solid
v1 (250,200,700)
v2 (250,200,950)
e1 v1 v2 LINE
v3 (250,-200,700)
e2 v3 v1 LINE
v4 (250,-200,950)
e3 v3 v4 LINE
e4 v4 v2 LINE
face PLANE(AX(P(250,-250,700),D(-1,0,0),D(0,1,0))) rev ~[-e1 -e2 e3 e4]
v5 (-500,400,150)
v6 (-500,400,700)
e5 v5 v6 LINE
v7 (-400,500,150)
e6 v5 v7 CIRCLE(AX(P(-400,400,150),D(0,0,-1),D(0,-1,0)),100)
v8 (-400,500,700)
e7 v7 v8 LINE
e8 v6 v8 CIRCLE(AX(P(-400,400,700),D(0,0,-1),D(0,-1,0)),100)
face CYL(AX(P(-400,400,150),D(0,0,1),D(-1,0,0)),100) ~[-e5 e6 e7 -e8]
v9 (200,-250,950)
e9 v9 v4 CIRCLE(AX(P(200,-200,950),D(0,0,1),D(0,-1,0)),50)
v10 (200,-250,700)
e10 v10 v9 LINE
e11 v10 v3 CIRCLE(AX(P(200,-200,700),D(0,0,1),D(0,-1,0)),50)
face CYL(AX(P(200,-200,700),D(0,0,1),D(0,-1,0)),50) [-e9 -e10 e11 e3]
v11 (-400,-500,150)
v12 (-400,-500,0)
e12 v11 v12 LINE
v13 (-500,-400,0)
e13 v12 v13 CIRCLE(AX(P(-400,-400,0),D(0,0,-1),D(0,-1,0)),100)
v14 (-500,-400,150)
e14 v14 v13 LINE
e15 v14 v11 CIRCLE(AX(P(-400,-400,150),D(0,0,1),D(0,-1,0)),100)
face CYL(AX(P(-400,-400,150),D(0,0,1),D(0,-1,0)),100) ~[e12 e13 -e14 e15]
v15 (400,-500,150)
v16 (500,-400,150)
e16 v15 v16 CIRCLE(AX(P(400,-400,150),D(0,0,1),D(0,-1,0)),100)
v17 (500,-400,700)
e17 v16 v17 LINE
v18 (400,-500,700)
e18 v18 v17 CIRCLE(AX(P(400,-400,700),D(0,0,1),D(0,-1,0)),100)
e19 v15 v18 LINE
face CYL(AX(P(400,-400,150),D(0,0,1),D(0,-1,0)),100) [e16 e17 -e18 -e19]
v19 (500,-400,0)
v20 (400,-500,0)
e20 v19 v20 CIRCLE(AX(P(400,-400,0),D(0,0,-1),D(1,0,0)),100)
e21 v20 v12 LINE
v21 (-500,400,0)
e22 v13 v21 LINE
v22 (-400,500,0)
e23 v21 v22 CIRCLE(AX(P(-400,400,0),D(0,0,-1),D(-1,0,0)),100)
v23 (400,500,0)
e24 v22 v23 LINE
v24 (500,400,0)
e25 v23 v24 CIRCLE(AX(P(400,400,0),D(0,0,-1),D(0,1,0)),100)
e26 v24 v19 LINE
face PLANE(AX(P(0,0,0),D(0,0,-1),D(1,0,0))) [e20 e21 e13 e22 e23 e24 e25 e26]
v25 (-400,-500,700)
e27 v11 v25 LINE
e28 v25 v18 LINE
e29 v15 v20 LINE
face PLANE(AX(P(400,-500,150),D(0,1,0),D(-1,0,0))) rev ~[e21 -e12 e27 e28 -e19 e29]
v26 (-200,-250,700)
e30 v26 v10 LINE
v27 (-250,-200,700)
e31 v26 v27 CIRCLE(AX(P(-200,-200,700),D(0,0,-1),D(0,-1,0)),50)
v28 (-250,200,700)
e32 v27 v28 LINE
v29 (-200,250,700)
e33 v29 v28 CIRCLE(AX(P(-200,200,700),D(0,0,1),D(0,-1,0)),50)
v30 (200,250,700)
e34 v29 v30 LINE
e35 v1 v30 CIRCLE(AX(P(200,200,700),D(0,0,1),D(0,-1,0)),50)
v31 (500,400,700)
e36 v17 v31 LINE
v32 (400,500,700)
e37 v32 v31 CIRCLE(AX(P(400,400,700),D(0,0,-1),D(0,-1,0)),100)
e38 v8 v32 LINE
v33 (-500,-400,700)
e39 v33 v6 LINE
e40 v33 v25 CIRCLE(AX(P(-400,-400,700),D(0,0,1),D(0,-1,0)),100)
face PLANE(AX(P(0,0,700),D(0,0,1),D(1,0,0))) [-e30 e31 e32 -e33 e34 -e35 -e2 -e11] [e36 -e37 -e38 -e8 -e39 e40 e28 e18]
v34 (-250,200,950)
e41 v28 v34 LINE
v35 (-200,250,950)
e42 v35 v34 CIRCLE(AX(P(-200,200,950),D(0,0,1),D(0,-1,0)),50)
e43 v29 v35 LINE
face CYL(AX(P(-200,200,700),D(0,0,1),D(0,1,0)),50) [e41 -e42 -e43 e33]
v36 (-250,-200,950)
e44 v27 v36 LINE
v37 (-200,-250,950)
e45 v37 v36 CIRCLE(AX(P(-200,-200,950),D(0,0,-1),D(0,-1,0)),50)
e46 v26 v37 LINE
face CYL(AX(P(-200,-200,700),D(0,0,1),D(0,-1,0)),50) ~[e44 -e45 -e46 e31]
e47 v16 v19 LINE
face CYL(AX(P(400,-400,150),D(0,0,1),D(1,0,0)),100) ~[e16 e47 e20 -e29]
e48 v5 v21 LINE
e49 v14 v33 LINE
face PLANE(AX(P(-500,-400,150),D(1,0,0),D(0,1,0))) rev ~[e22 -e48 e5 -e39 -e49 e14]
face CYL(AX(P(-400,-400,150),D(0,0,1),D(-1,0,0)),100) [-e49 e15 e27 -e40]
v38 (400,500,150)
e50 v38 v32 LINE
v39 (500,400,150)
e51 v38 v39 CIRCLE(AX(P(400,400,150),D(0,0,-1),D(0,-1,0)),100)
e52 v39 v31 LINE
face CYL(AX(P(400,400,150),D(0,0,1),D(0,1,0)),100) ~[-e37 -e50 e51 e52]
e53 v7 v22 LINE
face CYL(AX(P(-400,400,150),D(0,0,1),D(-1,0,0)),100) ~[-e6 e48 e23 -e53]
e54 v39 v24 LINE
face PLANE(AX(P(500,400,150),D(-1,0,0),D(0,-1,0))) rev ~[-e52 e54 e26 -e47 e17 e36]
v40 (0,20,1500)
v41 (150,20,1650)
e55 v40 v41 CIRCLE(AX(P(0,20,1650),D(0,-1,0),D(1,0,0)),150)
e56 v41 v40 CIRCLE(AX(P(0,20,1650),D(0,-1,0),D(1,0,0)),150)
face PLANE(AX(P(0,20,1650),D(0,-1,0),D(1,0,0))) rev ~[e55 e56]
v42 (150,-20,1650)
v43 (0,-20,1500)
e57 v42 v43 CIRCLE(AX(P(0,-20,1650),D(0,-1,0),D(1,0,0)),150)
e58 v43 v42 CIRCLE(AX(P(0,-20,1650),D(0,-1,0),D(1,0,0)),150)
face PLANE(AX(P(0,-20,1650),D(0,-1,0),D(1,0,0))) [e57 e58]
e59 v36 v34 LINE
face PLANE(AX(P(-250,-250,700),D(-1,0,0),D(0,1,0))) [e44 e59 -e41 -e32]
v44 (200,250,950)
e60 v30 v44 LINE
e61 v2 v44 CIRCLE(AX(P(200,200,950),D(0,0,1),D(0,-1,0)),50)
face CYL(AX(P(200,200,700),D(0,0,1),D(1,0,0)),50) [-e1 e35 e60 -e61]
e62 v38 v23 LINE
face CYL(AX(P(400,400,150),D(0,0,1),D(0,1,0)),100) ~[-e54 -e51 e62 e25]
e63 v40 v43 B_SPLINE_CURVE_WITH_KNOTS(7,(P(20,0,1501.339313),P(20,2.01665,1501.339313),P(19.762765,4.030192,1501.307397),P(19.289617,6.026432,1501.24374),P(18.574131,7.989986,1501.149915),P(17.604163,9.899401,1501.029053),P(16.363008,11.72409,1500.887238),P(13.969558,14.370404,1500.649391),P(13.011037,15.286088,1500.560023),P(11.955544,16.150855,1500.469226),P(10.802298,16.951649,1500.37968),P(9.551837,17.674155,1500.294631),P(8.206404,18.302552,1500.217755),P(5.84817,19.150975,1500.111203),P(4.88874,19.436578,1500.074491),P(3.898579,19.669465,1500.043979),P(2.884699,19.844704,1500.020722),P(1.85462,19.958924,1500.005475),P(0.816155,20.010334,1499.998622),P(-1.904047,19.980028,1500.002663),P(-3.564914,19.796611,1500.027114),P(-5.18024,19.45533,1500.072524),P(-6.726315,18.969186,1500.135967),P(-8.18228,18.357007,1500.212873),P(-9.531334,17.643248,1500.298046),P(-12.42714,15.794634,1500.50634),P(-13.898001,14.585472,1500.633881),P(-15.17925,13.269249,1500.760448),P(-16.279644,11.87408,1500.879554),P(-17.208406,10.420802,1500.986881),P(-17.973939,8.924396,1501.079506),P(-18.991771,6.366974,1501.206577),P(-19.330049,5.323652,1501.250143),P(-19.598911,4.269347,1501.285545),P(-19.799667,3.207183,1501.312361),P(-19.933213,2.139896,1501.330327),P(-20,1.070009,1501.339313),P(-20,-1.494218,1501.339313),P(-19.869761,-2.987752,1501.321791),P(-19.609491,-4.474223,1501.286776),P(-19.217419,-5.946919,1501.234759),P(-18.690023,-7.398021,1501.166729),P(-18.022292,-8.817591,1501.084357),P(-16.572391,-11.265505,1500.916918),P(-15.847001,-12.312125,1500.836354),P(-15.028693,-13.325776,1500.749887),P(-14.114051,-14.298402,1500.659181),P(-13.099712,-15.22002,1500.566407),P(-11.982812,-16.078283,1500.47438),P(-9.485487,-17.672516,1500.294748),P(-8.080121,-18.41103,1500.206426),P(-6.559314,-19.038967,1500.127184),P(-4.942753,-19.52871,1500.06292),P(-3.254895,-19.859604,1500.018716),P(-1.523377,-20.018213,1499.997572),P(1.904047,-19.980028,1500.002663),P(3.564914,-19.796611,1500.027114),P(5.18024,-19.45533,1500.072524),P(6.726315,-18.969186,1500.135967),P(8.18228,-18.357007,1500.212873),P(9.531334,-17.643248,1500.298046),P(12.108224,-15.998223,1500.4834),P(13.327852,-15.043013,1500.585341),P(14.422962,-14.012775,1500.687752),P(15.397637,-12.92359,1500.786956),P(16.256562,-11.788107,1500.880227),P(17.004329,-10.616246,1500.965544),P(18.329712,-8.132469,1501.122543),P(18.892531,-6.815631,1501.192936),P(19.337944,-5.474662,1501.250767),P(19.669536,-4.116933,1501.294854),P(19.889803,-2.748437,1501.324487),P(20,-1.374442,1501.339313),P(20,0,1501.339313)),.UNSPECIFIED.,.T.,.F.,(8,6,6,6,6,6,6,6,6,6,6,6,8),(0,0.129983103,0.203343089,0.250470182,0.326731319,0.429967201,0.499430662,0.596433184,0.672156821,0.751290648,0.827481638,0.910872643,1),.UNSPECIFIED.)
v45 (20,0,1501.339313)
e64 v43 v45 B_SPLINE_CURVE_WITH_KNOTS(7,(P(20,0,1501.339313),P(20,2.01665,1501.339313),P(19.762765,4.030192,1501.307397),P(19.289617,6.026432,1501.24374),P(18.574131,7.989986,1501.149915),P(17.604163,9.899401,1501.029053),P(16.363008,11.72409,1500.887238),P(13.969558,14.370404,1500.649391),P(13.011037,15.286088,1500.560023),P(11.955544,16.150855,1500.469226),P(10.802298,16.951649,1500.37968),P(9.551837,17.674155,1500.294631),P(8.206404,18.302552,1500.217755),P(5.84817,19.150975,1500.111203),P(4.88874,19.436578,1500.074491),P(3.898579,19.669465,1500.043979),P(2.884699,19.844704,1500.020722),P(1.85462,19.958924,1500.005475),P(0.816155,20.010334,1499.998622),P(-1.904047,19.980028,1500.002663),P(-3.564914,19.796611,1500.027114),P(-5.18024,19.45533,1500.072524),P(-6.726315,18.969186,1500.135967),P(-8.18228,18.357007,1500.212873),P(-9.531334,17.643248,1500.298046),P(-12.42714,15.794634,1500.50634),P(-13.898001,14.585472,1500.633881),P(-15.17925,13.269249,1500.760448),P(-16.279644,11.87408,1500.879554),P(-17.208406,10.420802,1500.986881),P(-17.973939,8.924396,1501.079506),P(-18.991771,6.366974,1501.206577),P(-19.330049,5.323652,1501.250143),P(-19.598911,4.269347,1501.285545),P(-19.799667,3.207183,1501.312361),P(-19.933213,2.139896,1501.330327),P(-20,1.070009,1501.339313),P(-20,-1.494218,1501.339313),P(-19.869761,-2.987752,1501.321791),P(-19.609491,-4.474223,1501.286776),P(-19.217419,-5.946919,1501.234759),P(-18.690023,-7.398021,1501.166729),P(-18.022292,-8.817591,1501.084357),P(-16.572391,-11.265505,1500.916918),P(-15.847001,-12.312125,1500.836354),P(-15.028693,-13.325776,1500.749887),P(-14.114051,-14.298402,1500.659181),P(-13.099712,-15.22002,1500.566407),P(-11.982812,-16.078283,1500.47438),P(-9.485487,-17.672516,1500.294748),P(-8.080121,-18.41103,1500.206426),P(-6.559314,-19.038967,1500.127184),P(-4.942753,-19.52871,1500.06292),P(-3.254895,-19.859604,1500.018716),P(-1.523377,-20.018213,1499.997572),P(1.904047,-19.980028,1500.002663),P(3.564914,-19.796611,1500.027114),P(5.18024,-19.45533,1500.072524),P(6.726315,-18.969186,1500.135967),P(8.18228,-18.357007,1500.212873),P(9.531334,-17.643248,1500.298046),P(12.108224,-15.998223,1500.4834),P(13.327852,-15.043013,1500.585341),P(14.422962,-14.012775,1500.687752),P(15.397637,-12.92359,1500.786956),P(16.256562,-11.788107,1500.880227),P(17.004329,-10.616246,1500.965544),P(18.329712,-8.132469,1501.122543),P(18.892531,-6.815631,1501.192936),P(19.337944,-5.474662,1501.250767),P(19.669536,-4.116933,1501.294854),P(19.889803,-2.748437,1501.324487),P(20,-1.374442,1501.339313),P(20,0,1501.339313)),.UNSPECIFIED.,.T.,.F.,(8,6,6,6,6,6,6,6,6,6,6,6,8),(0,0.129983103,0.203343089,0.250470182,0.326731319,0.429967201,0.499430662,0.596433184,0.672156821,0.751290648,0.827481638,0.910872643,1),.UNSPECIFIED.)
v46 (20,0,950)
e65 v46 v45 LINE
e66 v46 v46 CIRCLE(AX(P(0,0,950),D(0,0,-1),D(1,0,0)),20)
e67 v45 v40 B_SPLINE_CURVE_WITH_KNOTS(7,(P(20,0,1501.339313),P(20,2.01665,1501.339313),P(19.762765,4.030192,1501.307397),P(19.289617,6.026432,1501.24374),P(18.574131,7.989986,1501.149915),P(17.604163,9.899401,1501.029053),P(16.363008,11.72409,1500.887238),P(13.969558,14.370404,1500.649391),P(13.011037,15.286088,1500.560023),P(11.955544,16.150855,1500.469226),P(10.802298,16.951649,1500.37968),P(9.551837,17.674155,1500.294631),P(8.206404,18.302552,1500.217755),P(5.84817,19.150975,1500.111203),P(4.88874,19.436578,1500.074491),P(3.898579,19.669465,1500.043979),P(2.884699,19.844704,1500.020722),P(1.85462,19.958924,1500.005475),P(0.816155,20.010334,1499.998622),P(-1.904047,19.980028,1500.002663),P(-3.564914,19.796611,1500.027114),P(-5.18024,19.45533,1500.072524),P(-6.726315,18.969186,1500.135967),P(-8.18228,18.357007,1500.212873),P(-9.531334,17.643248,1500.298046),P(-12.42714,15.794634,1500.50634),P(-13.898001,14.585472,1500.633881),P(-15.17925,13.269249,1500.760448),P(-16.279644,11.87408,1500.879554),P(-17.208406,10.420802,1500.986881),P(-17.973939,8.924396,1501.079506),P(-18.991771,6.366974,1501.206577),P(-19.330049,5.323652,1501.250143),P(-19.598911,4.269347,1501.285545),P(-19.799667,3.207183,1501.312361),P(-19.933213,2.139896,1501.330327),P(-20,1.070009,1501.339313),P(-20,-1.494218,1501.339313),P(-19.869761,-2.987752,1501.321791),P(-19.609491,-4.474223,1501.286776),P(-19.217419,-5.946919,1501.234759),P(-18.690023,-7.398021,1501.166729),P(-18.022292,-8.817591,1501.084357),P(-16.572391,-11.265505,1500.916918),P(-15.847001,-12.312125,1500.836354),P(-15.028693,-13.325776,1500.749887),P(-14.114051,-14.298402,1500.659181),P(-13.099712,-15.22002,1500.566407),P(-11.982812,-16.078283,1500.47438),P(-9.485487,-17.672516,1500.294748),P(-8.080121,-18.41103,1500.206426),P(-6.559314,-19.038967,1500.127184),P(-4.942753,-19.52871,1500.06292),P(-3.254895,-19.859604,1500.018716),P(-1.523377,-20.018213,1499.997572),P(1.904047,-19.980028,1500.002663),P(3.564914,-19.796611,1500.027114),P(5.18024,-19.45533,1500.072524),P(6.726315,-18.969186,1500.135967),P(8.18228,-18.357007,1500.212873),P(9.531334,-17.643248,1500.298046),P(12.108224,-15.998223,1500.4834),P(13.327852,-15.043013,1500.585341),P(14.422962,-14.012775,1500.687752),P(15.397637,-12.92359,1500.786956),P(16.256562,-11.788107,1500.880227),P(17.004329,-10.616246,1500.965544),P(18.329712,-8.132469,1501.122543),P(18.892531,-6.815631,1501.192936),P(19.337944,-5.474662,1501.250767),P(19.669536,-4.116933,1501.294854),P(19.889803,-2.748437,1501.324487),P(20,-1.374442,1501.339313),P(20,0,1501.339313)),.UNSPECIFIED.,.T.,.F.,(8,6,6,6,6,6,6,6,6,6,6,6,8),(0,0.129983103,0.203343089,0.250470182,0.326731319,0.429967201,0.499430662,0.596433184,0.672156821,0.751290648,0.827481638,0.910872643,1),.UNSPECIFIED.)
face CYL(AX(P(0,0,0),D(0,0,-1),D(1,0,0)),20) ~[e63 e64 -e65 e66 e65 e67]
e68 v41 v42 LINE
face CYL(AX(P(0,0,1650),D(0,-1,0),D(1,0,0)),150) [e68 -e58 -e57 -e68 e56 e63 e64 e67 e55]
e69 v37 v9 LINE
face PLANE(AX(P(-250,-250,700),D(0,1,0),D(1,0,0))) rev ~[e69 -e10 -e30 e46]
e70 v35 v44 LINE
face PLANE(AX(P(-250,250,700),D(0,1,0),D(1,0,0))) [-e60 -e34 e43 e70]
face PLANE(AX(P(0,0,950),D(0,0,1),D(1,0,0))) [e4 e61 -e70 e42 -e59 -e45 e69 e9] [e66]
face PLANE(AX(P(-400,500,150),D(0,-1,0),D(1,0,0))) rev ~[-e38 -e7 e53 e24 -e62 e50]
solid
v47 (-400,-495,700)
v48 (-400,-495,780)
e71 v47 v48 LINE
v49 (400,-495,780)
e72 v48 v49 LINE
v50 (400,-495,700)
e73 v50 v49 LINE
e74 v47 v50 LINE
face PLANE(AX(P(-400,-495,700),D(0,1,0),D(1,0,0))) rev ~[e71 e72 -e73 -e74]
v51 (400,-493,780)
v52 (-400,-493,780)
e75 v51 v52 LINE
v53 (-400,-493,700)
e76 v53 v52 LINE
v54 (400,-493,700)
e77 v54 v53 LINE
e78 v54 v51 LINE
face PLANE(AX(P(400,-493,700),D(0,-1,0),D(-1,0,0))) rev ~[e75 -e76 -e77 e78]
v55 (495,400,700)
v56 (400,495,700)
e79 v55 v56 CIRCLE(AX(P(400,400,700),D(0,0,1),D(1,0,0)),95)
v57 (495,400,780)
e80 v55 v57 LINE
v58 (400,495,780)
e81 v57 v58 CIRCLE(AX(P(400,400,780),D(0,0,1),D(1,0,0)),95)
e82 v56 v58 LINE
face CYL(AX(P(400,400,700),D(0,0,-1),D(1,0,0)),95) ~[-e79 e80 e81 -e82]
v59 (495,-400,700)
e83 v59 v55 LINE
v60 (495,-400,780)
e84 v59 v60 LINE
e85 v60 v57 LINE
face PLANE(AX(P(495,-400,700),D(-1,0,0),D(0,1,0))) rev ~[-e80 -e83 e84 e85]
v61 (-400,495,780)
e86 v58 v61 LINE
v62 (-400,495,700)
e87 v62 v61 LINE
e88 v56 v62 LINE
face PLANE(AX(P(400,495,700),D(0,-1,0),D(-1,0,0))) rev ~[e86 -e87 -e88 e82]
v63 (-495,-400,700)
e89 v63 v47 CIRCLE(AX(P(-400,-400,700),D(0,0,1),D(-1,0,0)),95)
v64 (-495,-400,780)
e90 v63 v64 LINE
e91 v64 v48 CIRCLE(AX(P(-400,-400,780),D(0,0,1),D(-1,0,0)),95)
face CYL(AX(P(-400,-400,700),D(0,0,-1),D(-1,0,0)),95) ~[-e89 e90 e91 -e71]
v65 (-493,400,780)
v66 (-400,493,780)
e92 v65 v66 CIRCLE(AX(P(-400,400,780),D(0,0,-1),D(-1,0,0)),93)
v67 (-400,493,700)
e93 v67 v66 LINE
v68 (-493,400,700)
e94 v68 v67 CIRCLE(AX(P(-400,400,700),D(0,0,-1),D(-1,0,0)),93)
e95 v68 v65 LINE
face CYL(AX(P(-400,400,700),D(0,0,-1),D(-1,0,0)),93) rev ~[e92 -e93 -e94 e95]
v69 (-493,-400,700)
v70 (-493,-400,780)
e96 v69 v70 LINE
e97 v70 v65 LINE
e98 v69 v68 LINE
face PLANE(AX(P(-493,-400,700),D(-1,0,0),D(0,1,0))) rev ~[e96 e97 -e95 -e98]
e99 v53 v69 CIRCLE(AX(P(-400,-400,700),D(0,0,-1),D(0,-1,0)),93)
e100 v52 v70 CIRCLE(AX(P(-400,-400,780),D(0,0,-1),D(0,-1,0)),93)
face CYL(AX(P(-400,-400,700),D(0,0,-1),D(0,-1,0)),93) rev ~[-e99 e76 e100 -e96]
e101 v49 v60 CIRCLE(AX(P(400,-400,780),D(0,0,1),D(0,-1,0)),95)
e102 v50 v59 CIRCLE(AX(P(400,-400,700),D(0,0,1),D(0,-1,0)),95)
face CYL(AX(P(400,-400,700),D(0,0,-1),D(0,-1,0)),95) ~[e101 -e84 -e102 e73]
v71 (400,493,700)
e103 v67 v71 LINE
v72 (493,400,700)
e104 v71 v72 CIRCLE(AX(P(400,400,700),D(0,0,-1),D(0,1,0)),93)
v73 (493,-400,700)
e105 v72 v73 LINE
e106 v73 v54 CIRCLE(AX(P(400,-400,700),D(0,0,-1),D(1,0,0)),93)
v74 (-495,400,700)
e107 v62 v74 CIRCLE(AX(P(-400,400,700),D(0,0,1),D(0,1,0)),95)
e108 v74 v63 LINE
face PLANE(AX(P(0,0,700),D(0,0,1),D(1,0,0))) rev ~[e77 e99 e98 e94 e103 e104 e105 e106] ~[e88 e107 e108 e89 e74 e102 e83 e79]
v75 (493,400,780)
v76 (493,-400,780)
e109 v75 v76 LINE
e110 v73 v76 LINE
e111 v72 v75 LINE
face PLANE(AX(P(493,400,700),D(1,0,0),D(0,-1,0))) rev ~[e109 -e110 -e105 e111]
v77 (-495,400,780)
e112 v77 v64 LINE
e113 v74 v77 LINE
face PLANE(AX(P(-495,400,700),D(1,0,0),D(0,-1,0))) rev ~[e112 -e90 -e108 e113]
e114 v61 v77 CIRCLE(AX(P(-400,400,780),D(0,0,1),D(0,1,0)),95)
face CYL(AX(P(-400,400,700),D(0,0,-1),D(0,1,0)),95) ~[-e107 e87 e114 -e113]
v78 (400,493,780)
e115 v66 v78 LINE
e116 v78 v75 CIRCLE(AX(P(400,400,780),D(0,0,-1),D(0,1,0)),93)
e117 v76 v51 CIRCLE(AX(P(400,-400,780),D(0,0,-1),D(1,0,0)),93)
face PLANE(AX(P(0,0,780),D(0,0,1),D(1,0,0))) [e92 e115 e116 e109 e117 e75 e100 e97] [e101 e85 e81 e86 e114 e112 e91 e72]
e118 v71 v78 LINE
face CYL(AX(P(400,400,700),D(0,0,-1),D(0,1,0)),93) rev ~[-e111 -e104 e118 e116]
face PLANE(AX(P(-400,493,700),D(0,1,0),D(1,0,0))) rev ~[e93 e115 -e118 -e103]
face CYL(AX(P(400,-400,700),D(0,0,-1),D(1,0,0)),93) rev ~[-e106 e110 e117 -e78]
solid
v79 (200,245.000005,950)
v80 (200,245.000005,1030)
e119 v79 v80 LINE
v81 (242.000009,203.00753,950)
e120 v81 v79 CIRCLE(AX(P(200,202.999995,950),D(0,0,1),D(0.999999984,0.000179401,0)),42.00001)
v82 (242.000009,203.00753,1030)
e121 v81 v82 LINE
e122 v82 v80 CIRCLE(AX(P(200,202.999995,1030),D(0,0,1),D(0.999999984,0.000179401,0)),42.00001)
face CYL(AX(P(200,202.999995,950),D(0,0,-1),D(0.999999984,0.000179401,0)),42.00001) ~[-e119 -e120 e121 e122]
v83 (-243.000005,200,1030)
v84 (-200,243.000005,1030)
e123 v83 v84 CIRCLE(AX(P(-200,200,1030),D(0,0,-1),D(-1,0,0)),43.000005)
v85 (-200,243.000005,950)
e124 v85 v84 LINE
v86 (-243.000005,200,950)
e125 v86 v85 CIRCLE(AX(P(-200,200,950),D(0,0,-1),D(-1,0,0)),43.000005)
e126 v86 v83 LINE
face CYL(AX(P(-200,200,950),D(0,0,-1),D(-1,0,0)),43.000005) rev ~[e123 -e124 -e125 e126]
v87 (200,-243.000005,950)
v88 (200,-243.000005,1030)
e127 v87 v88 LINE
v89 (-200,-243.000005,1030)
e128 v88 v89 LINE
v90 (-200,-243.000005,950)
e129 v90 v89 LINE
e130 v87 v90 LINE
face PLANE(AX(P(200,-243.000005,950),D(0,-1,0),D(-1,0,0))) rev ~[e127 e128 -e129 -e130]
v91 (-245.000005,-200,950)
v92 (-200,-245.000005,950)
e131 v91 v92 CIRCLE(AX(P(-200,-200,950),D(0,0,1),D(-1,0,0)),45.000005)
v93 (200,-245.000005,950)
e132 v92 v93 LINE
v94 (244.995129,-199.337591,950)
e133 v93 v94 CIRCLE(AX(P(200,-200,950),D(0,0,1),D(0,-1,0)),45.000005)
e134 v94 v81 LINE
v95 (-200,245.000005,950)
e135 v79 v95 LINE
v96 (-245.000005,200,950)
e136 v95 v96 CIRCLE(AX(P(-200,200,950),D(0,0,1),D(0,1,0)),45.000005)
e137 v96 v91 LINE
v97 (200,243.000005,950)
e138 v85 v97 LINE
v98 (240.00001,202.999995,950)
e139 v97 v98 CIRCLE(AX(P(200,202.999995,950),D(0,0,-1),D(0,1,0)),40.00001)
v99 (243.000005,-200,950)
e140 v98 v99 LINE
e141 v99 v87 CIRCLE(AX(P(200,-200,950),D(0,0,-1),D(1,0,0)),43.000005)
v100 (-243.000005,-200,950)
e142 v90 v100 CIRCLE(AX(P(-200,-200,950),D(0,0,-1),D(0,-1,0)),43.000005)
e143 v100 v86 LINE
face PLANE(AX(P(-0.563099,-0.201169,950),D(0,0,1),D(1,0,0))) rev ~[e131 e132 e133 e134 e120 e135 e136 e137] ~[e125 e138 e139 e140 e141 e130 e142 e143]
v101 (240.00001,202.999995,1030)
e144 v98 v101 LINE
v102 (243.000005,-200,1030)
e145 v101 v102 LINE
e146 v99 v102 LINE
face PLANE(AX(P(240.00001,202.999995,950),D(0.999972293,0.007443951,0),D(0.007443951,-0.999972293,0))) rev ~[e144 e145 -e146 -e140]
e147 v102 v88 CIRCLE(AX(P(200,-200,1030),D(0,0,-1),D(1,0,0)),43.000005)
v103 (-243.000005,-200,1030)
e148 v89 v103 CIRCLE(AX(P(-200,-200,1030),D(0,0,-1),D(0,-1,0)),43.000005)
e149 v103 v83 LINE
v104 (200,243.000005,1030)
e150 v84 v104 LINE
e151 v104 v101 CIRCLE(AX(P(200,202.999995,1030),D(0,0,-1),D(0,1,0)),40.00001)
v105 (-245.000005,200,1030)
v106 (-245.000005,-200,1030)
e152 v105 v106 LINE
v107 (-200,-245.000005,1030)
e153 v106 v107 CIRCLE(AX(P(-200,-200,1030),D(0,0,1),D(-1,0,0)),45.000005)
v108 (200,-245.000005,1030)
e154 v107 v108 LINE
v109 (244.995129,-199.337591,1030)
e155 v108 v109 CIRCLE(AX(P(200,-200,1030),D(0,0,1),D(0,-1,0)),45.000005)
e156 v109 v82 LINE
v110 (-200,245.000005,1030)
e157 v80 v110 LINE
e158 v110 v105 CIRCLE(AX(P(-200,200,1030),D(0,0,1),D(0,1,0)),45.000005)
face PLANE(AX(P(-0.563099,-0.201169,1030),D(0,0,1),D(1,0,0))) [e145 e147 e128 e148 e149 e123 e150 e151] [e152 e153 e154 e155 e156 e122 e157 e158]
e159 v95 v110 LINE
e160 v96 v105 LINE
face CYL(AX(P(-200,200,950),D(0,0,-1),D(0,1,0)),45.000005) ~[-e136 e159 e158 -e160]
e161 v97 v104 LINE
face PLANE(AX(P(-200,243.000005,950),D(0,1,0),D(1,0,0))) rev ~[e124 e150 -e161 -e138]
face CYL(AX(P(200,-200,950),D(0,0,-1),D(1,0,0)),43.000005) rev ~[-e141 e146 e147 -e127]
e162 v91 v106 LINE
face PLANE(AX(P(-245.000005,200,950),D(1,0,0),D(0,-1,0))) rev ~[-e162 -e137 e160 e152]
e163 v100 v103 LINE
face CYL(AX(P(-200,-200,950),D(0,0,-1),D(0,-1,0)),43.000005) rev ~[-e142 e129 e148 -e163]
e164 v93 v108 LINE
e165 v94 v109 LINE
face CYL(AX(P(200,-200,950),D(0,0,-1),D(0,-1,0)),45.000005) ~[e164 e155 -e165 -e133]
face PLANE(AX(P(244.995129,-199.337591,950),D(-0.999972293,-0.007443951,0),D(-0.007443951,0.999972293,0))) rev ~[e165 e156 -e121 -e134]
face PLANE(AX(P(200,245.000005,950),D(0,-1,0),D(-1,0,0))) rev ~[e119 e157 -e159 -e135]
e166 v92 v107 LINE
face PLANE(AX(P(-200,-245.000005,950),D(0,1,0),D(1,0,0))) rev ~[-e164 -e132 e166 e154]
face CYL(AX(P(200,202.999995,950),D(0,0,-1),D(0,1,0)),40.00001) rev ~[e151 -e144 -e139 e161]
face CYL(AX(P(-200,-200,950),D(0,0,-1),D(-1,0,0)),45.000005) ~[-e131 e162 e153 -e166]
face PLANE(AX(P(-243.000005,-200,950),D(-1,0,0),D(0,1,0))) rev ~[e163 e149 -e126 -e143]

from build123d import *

# Parameters (mm, degrees)
F2_W      = 900
F2_H      = 900
F3_DEPTH  = 150
F4_W      = 1000
F4_H      = 1000
F5_DEPTH  = 550
F6_W      = 500
F6_H      = 500
F7_DEPTH  = 250
F8_R      = 100
F9_R      = 85
F10_R     = 50
F12_DEPTH = 80
F14_DEPTH = 80
F15_R     = 20
F16_DEPTH = 1600
F18_R     = 150
F19_DEPTH = 20
F21_DEPTH = 150


# Not quite as in the source:
# - a feature of the source that left no trace in its solid (it failed there, or was rolled back) is left out


with BuildPart() as f3:
    # F2 (on Top) → F3 (new body, through all)
    with BuildSketch(Plane.XY):
        Rectangle(F2_W, F2_H)
    extrude(amount=F3_DEPTH)

    # F4 (on face) → F5 (join, through all)
    with BuildSketch(Plane.XY.offset(150)):
        Rectangle(F4_W, F4_H)
    extrude(amount=F5_DEPTH)

    # F6 (on face) → F7 (join)
    with BuildSketch(Plane.XY.offset(700)):
        Rectangle(F6_W, F6_H)
    extrude(amount=F7_DEPTH)

    # F8
    f8_edges = [f3.edges().sort_by_distance(p)[0] for p in [
        (500, -500, 425),
        (-500, -500, 425),
        (500, 500, 425),
        (-500, 500, 425),
    ]]
    fillet(f8_edges, radius=F8_R)

    # F9
    f9_edges = [f3.edges().sort_by_distance(p)[0] for p in [
        (-450, 450, 75),
        (-450, -450, 75),
        (450, -450, 75),
        (450, 450, 75),
    ]]
    fillet(f9_edges, radius=F9_R)

    # F10
    f10_edges = [f3.edges().sort_by_distance(p)[0] for p in [
        (-250, -250, 825),
        (250, -250, 825),
        (250, 250, 825),
        (-250, 250, 825),
    ]]
    fillet(f10_edges, radius=F10_R)

    # F15 (on Top) → F16 (join)
    with BuildSketch(Plane.XY):
        Circle(F15_R)
    extrude(amount=F16_DEPTH)

    # F18 (on Front) → F19 (join, symmetric)
    with BuildSketch(Plane.XZ):
        with Locations((0, 1650)):
            Circle(F18_R)
    extrude(amount=F19_DEPTH, both=True)

    # F20 (on face) → F21 (join, through all)
    with BuildSketch(Plane(origin=(0, 0, 150), x_dir=(1, 0, 0), z_dir=(0, 0, -1))):
        with BuildLine():
            Line((400, 500), (-400, 500))
            ThreePointArc((-400, 500), (-470.7106781187, 470.7106781187), (-500, 400))
            Line((-500, 400), (-500, -400))
            ThreePointArc((-500, -400), (-470.7106781187, -470.7106781187), (-400, -500))
            Line((-400, -500), (400, -500))
            ThreePointArc((400, -500), (470.7106781187, -470.7106781187), (500, -400))
            Line((500, -400), (500, 400))
            ThreePointArc((500, 400), (470.7106781187, 470.7106781187), (400, 500))
        make_face()
        with BuildLine():
            ThreePointArc((365, 450), (425.1040764009, 425.1040764009), (450, 365))
            Line((450, 365), (450, -365))
            ThreePointArc((450, -365), (425.1040764009, -425.1040764009), (365, -450))
            Line((365, -450), (-365, -450))
            ThreePointArc((-365, -450), (-425.1040764009, -425.1040764009), (-450, -365))
            Line((-450, -365), (-450, 365))
            ThreePointArc((-450, 365), (-425.1040764009, 425.1040764009), (-365, 450))
            Line((-365, 450), (365, 450))
        make_face(mode=Mode.SUBTRACT)
    extrude(amount=F21_DEPTH)


with BuildPart() as f12:
    # F11 (on face) → F12 (new body)
    with BuildSketch(Plane.XY.offset(700)):
        with BuildLine():
            ThreePointArc((-400, 495), (-467.1751442127, 467.1751442127), (-495, 400))
            Line((-495, 400), (-495, -400))
            ThreePointArc((-495, -400), (-467.1751442127, -467.1751442127), (-400, -495))
            Line((-400, -495), (400, -495))
            ThreePointArc((400, -495), (467.1751442127, -467.1751442127), (495, -400))
            Line((495, -400), (495, 400))
            ThreePointArc((495, 400), (467.1751442127, 467.1751442127), (400, 495))
            Line((400, 495), (-400, 495))
        make_face()
        with BuildLine():
            ThreePointArc((493, -400), (465.7609306503, -465.7609306503), (400, -493))
            Line((400, -493), (-400, -493))
            ThreePointArc((-400, -493), (-465.7609306503, -465.7609306503), (-493, -400))
            Line((-493, -400), (-493, 400))
            ThreePointArc((-493, 400), (-465.7609306503, 465.7609306503), (-400, 493))
            Line((-400, 493), (400, 493))
            ThreePointArc((400, 493), (465.7609306503, 465.7609306503), (493, 400))
            Line((493, 400), (493, -400))
        make_face(mode=Mode.SUBTRACT)
    extrude(amount=F12_DEPTH)


with BuildPart() as f14:
    # F13 (on face) → F14 (new body)
    with BuildSketch(Plane.XY.offset(950)):
        with BuildLine():
            ThreePointArc((242.0000088609, 203.0075300193), (229.6958274631, 232.7011505768), (200, 245.0000047089))
            Line((200, 245.0000047089), (-200, 245.0000047089))
            ThreePointArc((-200, 245.0000047089), (-231.8198084831, 231.8198084831), (-245.0000047089, 200))
            Line((-245.0000047089, 200), (-245.0000047089, -200))
            ThreePointArc((-245.0000047089, -200), (-231.8198084831, -231.8198084831), (-200, -245.0000047089))
            Line((-200, -245.0000047089), (200, -245.0000047089))
            ThreePointArc((200, -245.0000047089), (232.0531499414, -231.5847431942), (244.9951290454, -199.3375907688))
            Line((244.9951290454, -199.3375907688), (242.0000088609, 203.0075300193))
        make_face()
        with BuildLine():
            ThreePointArc((-243.0000047089, 200), (-230.4055949208, 230.4055949208), (-200, 243.0000047089))
            Line((-200, 243.0000047089), (200, 243.0000047089))
            ThreePointArc((200, 243.0000047089), (228.284277991, 231.2842731632), (240.0000095367, 202.9999951722))
            Line((240.0000095367, 202.9999951722), (243.0000047089, -200))
            ThreePointArc((243.0000047089, -200), (230.4055949208, -230.4055949208), (200, -243.0000047089))
            Line((200, -243.0000047089), (-200, -243.0000047089))
            ThreePointArc((-200, -243.0000047089), (-230.4055949208, -230.4055949208), (-243.0000047089, -200))
            Line((-243.0000047089, -200), (-243.0000047089, 200))
        make_face(mode=Mode.SUBTRACT)
    extrude(amount=F14_DEPTH)


solid = Compound([f3.part, f12.part, f14.part])
